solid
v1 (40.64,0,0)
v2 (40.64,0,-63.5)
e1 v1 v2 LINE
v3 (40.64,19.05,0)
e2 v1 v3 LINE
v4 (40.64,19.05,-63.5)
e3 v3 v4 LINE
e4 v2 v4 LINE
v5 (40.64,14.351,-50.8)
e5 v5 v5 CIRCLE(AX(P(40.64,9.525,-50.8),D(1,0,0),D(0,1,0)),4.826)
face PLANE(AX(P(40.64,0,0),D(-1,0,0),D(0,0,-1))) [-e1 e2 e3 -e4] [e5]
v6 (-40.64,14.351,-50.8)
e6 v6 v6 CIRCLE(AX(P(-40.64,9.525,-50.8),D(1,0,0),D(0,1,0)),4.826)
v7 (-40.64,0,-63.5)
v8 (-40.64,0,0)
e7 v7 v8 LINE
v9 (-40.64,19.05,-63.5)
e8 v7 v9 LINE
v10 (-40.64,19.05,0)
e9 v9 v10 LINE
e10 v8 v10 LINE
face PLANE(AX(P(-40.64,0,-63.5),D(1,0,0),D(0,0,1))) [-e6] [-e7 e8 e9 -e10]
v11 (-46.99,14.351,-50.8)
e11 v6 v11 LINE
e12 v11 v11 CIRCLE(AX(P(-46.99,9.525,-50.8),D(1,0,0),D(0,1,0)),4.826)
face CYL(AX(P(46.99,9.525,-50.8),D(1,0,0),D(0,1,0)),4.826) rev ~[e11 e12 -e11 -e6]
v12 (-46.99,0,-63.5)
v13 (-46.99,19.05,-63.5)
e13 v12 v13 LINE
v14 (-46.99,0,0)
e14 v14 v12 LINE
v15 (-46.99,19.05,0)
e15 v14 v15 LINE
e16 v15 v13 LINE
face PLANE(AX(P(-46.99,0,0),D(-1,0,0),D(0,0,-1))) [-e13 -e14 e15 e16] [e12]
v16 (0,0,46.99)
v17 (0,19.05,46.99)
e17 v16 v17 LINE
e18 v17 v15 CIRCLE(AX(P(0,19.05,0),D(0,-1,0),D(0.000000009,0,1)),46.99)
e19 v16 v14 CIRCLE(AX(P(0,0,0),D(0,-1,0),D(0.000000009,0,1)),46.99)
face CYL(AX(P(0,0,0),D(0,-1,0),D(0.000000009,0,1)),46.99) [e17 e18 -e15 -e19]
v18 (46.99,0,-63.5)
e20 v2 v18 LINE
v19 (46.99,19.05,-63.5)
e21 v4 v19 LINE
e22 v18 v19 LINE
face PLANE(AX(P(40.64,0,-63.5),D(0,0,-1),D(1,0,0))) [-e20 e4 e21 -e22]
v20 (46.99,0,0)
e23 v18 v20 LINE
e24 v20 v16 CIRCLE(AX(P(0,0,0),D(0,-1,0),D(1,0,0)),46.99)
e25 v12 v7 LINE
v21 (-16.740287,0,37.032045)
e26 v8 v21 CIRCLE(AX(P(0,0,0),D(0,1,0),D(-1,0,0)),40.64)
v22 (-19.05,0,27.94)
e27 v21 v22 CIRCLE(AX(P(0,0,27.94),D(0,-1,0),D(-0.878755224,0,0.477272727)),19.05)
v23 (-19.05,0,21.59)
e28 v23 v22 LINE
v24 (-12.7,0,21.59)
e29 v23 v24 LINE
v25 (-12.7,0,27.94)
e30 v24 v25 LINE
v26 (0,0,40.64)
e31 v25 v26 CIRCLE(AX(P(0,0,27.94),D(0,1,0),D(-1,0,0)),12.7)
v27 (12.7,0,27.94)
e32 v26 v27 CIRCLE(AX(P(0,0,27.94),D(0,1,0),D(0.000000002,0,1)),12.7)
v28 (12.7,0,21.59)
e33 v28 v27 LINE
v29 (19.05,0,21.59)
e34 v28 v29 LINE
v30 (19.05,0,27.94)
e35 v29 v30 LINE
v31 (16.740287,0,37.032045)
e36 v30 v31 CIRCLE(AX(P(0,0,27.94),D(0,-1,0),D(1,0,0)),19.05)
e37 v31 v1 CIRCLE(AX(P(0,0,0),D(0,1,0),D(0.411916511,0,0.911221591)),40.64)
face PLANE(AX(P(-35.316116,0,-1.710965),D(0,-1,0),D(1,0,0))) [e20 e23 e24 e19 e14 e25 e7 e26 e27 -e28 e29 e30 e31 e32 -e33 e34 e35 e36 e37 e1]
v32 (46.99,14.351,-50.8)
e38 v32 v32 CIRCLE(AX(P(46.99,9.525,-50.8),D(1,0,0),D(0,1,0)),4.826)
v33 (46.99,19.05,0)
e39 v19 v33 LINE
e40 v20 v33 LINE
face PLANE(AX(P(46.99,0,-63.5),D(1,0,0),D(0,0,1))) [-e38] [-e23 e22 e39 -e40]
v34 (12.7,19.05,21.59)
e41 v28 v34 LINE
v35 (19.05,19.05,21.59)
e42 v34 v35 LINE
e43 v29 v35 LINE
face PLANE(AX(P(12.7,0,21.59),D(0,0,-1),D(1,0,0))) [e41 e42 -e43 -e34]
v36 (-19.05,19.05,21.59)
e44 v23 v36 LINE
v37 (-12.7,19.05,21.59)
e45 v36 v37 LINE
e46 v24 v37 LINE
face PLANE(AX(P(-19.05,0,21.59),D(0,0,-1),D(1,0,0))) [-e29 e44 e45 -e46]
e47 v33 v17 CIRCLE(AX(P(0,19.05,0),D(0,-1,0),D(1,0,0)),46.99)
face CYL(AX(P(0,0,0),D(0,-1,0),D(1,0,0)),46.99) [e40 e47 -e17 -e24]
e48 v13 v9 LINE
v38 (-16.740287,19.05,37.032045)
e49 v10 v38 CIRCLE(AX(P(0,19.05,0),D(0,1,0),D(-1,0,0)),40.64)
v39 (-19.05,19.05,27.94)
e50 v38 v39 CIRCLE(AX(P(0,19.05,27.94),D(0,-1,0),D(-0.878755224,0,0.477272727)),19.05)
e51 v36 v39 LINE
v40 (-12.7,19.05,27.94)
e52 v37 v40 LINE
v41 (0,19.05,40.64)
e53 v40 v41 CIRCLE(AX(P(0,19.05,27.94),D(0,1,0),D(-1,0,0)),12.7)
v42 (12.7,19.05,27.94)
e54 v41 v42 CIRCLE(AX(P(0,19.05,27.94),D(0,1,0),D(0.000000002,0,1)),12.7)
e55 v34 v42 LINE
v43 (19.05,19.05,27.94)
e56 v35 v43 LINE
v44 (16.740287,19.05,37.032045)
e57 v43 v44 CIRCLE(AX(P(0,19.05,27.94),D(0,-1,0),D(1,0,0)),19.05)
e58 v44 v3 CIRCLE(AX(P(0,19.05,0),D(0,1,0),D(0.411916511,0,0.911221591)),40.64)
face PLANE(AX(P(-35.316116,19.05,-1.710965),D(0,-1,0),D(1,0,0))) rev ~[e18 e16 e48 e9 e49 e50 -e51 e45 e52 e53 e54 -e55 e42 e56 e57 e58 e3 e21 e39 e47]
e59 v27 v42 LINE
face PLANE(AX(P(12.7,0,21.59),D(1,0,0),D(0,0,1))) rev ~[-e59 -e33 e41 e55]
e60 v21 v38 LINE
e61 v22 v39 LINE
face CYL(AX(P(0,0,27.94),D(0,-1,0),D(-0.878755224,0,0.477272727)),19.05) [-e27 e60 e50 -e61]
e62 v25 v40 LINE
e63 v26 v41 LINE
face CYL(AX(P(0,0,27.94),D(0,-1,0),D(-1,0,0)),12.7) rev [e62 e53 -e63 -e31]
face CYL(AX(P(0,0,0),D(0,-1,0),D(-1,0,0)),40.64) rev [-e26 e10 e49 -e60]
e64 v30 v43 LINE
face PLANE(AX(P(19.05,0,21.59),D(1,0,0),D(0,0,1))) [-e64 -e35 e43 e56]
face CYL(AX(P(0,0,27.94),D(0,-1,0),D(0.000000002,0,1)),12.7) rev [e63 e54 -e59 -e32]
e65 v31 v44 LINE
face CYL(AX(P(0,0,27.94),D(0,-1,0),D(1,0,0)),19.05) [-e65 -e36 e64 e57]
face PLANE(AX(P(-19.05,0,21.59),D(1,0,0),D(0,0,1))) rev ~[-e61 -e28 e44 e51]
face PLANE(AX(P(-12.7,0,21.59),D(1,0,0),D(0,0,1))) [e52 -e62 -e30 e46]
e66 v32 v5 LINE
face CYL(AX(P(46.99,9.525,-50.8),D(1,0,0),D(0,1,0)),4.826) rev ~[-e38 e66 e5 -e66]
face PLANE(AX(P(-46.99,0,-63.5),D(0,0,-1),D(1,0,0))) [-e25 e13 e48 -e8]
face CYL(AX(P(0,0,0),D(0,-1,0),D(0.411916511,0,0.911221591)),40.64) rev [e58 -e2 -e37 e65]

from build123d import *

# Parameters (mm, degrees)
F0_W     = 6.35
F0_H     = 6.35
F1_DEPTH = 19.05
F2_R     = 4.826
F3_DEPTH = 93.9810005078


# Not quite as in the source:
# - ends of sketch curves that miss each other by under 0.0002 mm in the source are joined


with BuildPart() as f1:
    # F0 (on Front) → F1 (new body)
    with BuildSketch(Plane.XZ):
        with BuildLine():
            Line((-40.64, -63.5), (-40.64, 0))
            ThreePointArc((-40.64, 0), (-34.1462652747, 22.0372903913), (-16.7402870182, 37.0320454545))
            ThreePointArc((-16.7402870182, 37.0320454545), (-9.7390716727, 44.3123236883), (0, 46.99))
            ThreePointArc((0, 46.99), (-33.2269478275, 33.2269478275), (-46.9900002539, 0))
            Line((-46.9900002539, 0), (-46.9900002539, -63.5))
            Line((-46.9900002539, -63.5), (-40.64, -63.5))
        make_face()
        with BuildLine():
            ThreePointArc((0, 46.99), (-9.7390716727, 44.3123236883), (-16.7402870182, 37.0320454545))
            ThreePointArc((-16.7402870182, 37.0320454545), (-8.5623382423, 39.727773205), (2.25e-08, 40.64))
            ThreePointArc((2.25e-08, 40.64), (8.5623382643, 39.7277732002), (16.7402870182, 37.0320454545))
            ThreePointArc((16.7402870182, 37.0320454545), (9.7390716727, 44.3123236883), (0, 46.99))
        make_face()
        with BuildLine():
            ThreePointArc((16.7402870182, 37.0320454545), (34.1462652747, 22.0372903913), (40.64, 0))
            Line((40.64, 0), (40.64, -63.5))
            Line((40.64, -63.5), (46.9900002539, -63.5))
            Line((46.9900002539, -63.5), (46.9900002539, 0))
            ThreePointArc((46.9900002539, 0), (33.2269478275, 33.2269478275), (0, 46.9900002539))
            ThreePointArc((0, 46.9900002539), (9.7390716727, 44.3123236883), (16.7402870182, 37.0320454545))
        make_face()
        with BuildLine():
            ThreePointArc((19.05, 27.94), (18.463544726, 32.6304174816), (16.7402870182, 37.0320454545))
            ThreePointArc((16.7402870182, 37.0320454545), (8.5623382643, 39.7277732002), (2.25e-08, 40.64))
            ThreePointArc((2.25e-08, 40.64), (8.980256129, 36.9202561131), (12.7, 27.94))
            Line((12.7, 27.94), (19.05, 27.94))
        make_face()
        with BuildLine():
            ThreePointArc((2.25e-08, 40.64), (-8.5623382423, 39.727773205), (-16.7402870182, 37.0320454545))
            ThreePointArc((-16.7402870182, 37.0320454545), (-18.463544726, 32.6304174816), (-19.05, 27.94))
            Line((-19.05, 27.94), (-12.7, 27.94))
            ThreePointArc((-12.7, 27.94), (-8.9802561131, 36.920256129), (2.25e-08, 40.64))
        make_face()
        with Locations((15.875, 24.765)):
            Rectangle(F0_W, F0_H)
        with Locations((-15.875, 24.765)):
            Rectangle(F0_W, F0_H)
    extrude(amount=-F1_DEPTH)

    # F2 (on face) → F3 (cut, through all)
    with BuildSketch(Plane.YZ.offset(46.9900002539)):
        with Locations((9.525, -50.8)):
            Circle(F2_R)
    extrude(amount=-F3_DEPTH, mode=Mode.SUBTRACT)


solid = f1.part
